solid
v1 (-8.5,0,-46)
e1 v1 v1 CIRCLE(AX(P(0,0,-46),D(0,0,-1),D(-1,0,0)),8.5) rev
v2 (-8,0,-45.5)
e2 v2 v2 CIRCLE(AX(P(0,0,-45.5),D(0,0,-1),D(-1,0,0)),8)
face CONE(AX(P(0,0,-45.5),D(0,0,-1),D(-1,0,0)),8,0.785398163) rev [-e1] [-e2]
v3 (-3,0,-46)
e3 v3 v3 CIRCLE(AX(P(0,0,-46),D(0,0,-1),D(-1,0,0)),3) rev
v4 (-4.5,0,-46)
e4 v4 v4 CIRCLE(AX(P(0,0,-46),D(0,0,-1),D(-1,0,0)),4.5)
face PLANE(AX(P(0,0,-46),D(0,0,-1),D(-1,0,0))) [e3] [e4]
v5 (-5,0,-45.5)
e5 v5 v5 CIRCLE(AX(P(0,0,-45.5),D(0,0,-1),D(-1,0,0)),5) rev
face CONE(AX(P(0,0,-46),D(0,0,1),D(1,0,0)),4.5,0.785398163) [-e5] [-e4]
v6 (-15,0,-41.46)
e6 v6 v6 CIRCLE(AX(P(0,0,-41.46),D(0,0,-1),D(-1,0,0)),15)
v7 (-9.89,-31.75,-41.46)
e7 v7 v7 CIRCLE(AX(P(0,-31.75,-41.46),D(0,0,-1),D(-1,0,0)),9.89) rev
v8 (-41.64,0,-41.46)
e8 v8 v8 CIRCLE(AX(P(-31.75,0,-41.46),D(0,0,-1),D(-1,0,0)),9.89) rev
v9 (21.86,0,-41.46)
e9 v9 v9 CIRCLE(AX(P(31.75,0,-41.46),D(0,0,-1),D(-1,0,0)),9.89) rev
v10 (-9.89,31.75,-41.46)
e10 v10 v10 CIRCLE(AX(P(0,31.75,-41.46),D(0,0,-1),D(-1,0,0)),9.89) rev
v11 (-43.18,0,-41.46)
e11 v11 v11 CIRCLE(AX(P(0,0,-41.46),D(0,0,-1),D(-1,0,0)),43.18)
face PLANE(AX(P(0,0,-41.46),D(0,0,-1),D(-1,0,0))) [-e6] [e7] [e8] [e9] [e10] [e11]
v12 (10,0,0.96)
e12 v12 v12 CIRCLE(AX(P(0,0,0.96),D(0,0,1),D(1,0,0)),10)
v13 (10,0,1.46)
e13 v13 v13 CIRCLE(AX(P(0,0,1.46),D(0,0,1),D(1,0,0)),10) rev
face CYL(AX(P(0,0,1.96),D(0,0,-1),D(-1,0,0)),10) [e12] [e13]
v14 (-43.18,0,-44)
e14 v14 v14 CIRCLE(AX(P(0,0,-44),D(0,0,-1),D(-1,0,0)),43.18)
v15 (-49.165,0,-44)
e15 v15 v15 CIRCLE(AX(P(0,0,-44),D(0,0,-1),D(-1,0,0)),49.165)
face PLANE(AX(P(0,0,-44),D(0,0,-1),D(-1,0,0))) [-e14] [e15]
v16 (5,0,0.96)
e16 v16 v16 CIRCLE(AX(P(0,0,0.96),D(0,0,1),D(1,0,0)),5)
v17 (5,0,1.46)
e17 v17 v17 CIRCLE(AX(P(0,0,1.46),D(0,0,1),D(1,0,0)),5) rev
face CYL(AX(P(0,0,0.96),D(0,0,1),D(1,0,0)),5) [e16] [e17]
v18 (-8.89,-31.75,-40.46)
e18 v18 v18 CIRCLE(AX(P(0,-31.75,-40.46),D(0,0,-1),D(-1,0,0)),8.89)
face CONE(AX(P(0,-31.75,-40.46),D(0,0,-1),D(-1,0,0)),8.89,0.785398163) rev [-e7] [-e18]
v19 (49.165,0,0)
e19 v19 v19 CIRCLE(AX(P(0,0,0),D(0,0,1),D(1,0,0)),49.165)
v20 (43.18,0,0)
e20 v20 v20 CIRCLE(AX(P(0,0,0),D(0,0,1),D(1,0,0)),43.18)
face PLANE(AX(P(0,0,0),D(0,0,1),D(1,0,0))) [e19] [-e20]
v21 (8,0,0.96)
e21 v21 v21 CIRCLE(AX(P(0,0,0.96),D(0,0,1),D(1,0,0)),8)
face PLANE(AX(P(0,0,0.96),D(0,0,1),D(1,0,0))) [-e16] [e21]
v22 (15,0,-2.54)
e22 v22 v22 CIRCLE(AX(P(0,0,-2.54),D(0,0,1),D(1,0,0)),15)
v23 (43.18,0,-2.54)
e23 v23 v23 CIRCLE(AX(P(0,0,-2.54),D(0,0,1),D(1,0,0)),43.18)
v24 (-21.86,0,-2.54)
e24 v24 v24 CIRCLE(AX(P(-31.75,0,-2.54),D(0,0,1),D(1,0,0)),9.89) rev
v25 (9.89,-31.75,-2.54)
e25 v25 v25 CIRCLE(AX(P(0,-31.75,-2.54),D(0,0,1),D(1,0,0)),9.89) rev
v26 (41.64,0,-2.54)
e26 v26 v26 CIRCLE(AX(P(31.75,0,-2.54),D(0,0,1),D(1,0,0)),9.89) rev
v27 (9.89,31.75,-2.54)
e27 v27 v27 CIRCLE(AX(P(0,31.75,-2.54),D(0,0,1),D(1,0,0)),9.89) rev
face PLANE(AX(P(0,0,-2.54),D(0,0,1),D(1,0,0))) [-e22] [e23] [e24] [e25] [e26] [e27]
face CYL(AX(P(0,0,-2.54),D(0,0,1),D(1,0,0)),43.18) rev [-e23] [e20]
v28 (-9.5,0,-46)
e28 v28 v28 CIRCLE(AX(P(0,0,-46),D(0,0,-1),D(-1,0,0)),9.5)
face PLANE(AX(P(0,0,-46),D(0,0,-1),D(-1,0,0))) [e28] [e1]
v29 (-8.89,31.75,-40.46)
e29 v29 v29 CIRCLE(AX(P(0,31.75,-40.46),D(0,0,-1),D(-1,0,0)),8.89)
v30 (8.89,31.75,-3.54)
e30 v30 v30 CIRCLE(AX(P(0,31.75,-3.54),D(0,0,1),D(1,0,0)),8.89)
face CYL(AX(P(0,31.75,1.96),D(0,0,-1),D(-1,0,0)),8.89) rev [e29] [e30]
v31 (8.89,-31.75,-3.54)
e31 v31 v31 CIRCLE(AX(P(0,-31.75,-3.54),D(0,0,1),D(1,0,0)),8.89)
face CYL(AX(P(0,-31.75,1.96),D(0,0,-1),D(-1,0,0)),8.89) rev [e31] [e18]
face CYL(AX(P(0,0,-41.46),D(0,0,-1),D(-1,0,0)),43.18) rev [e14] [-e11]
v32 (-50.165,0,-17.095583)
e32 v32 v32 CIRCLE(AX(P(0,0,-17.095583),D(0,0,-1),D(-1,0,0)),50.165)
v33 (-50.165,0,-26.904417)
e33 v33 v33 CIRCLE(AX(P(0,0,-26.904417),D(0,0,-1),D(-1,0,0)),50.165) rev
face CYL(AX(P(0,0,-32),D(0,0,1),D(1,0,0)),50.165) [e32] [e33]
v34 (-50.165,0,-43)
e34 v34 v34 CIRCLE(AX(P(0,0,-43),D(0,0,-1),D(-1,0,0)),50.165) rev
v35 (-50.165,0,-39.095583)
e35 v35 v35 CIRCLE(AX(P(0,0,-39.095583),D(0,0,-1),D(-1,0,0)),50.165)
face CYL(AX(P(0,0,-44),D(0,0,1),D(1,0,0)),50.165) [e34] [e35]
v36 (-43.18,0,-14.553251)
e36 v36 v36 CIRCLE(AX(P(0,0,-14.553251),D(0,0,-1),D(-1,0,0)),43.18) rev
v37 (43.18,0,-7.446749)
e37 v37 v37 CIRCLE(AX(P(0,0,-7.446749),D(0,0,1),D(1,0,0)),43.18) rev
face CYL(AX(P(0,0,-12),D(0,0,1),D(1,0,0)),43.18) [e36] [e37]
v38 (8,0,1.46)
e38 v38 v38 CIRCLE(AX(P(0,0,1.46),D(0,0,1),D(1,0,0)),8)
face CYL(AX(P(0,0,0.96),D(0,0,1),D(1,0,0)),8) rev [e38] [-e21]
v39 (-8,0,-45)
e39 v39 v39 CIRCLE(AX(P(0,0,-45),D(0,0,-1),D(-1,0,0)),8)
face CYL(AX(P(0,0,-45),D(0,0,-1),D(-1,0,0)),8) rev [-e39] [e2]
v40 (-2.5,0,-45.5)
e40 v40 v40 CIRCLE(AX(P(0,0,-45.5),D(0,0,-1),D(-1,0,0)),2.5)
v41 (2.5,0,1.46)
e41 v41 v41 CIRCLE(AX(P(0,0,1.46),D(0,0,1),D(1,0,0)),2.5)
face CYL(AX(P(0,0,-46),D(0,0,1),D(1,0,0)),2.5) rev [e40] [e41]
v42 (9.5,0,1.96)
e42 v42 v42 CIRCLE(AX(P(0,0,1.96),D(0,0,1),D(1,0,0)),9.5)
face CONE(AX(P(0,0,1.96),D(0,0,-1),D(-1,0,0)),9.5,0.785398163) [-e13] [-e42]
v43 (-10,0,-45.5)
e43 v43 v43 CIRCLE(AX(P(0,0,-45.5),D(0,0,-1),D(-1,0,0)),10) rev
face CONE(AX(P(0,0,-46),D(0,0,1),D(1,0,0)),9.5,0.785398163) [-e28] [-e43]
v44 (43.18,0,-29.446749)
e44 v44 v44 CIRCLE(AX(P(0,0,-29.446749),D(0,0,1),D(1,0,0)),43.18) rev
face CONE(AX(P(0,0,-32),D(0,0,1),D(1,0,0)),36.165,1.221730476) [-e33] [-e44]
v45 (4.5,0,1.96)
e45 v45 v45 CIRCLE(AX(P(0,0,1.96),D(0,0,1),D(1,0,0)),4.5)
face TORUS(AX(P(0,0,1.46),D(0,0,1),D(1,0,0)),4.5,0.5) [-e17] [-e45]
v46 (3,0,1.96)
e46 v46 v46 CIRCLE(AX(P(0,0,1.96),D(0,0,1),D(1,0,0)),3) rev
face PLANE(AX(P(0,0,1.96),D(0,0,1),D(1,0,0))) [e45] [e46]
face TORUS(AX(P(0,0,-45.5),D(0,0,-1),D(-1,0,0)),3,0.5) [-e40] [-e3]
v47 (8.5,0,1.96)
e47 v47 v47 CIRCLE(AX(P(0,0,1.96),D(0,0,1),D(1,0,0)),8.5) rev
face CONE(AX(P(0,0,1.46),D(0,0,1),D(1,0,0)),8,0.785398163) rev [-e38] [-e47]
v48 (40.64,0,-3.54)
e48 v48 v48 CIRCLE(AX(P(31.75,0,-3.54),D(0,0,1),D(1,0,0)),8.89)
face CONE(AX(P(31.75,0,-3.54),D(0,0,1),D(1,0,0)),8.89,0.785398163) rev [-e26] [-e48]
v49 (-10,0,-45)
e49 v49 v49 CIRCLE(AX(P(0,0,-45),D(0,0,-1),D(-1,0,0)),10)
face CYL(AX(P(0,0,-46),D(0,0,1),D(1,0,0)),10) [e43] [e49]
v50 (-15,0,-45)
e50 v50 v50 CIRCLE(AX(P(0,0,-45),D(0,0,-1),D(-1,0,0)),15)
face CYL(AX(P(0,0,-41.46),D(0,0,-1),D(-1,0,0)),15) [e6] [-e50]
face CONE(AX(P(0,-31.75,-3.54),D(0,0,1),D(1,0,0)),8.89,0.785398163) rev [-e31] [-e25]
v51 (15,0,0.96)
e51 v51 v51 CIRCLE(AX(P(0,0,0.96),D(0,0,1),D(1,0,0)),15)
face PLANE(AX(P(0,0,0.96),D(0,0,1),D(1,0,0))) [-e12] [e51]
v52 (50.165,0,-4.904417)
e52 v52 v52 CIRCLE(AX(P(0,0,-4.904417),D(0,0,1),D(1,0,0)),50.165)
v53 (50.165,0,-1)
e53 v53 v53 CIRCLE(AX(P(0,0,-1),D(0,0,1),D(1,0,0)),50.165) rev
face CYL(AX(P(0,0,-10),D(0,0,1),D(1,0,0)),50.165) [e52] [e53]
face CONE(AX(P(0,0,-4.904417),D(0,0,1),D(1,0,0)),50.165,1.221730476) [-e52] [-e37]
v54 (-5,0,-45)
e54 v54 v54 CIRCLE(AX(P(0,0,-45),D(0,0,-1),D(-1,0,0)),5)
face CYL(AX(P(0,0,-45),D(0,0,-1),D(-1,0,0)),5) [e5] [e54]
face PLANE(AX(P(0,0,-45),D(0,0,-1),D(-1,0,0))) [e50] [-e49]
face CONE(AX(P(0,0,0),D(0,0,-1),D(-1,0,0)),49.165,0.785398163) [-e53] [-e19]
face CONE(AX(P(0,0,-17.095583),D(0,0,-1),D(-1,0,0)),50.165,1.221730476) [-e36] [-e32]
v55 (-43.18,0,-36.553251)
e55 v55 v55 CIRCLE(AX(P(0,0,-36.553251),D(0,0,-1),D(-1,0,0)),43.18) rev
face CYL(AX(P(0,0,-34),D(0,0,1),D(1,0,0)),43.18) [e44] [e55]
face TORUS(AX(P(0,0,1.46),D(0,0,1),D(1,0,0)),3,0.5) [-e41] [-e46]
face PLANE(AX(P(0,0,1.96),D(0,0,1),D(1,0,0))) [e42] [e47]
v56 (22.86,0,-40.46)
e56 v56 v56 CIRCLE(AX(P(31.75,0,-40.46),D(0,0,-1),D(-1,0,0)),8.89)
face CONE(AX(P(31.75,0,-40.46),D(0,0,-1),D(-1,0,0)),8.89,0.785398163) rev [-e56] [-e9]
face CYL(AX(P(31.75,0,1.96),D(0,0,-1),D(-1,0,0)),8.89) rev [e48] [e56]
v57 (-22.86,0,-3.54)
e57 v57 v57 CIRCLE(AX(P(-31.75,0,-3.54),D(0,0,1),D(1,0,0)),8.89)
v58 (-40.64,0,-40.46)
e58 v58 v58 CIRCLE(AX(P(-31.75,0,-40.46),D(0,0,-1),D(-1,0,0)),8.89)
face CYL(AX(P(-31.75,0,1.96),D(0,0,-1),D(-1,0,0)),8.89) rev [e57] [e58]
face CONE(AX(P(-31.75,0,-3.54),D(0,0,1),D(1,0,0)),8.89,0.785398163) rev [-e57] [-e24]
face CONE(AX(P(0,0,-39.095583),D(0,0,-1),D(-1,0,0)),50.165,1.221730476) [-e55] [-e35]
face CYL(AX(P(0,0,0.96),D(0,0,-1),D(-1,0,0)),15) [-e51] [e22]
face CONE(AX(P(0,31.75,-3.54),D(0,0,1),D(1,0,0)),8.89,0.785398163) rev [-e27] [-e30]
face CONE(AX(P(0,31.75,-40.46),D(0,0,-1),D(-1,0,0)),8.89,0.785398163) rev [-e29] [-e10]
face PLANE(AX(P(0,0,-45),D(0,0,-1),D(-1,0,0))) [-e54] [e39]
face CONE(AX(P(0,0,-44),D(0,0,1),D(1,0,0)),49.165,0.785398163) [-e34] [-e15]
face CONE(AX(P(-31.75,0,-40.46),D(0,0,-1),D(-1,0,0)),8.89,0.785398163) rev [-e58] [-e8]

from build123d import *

# Parameters (mm, degrees)
SKETCH2_R            = 50.165
BOSS_EXTRUDE1_DEPTH  = 10
SKETCH4_R            = 43.18
BOSS_EXTRUDE2_DEPTH  = 2
SKETCH5_R            = 50.165
BOSS_EXTRUDE3_DEPTH  = 20
SKETCH7_R            = 43.18
BOSS_EXTRUDE4_DEPTH  = 2
SKETCH8_R            = 50.165
BOSS_EXTRUDE5_DEPTH  = 10
CHAMFER1_SIZE        = 14
CHAMFER1_SIZE_2      = 5.09558328
CHAMFER2_SIZE        = 5.09558328
CHAMFER2_SIZE_2      = 14
CHAMFER4_SIZE        = 14
CHAMFER4_SIZE_2      = 5.09558328
CHAMFER5_SIZE        = 5.09558328
CHAMFER5_SIZE_2      = 14
SKETCH13_R           = 43.18
CUT_EXTRUDE3_DEPTH   = 2.54
SKETCH18_R           = 15
BOSS_EXTRUDE12_DEPTH = 3.5
SKETCH19_R           = 10
BOSS_EXTRUDE13_DEPTH = 1
SKETCH20_R           = 8
SKETCH20_R_2         = 5
CUT_EXTRUDE4_DEPTH   = 1
CUT_EXTRUDE5_START   = -2.54
SKETCH22_R           = 43.18
SKETCH22_R_2         = 15
CUT_EXTRUDE5_DEPTH   = 2.54
SKETCH23_R           = 15
BOSS_EXTRUDE14_DEPTH = 1
BOSS_EXTRUDE15_START = 1
SKETCH24_R           = 10
BOSS_EXTRUDE15_DEPTH = 1
CUT_EXTRUDE6_START   = -1
SKETCH25_R           = 8
SKETCH25_R_2         = 5
CUT_EXTRUDE6_DEPTH   = 1
SKETCH26_R           = 2.5
CUT_EXTRUDE7_DEPTH   = 86.634199068
CHAMFER9_SIZE        = 0.5
FILLET1_R            = 0.5
FILLET2_R            = 0.5
CHAMFER10_SIZE       = 0.5
CHAMFER11_SIZE       = 0.5
FILLET3_R            = 0.5
SKETCH29_R           = 8.89
CUT_EXTRUDE9_DEPTH   = 85.530326215
CHAMFER12_SIZE       = 1
CHAMFER13_SIZE       = 1


with BuildPart() as part:
    # Sketch2 → Boss-Extrude1 (new body)
    with BuildSketch(Plane.XY):
        Circle(SKETCH2_R)
    extrude(amount=-BOSS_EXTRUDE1_DEPTH)

    # Sketch4 → Boss-Extrude2 (add)
    with BuildSketch(Plane(origin=(0, 0, -10), x_dir=(-1, 0, 0), z_dir=(0, 0, -1))):
        with Locations(Location((0, 0, 0), (0, 0, 180))):
            Circle(SKETCH4_R)
    extrude(amount=BOSS_EXTRUDE2_DEPTH)

    # Sketch5 → Boss-Extrude3 (add)
    with BuildSketch(Plane(origin=(0, 0, -12), x_dir=(-1, 0, 0), z_dir=(0, 0, -1))):
        with Locations(Location((0, 0, 0), (0, 0, 180))):
            Circle(SKETCH5_R)
    extrude(amount=BOSS_EXTRUDE3_DEPTH)

    # Sketch7 → Boss-Extrude4 (add)
    with BuildSketch(Plane(origin=(0, 0, -32), x_dir=(-1, 0, 0), z_dir=(0, 0, -1))):
        with Locations(Location((0, 0, 0), (0, 0, 180))):
            Circle(SKETCH7_R)
    extrude(amount=BOSS_EXTRUDE4_DEPTH)

    # Sketch8 → Boss-Extrude5 (add)
    with BuildSketch(Plane(origin=(0, 0, -34), x_dir=(-1, 0, 0), z_dir=(0, 0, -1))):
        with Locations(Location((0, 0, 0), (0, 0, 180))):
            Circle(SKETCH8_R)
    extrude(amount=BOSS_EXTRUDE5_DEPTH)

    # Chamfer1
    # the kernel refuses this chamfer: 14, 5.09558328 mm, written as the material it takes off along each edge
    with BuildSketch(Plane(origin=(0, 0, -10), x_dir=(1, 0, 0), z_dir=(0, -1, 0))) as chamfer1_piece_1_section:
        Polygon((50.165 - CHAMFER1_SIZE, 0), (50.165, CHAMFER1_SIZE_2), (50.165, 0), align=None)
    chamfer1_piece_1 = revolve(axis=Axis((0, 0, -10), (0, 0, 1)), mode=Mode.PRIVATE)
    chamfer1_piece_1 = chamfer1_piece_1 - Plane(origin=(0, 0, -6.275641512), x_dir=(1, 0, 0), z_dir=(0, 0, 1)) * Cylinder(43.18, 201, mode=Mode.PRIVATE)
    add(chamfer1_piece_1, mode=Mode.SUBTRACT)

    # Chamfer2
    # the kernel refuses this chamfer: 14, 5.09558328 mm, written as the material it takes off along each edge
    with BuildSketch(Plane(origin=(0, 0, -12), x_dir=(1, 0, 0), z_dir=(0, 1, 0))) as chamfer2_piece_1_section:
        Polygon((50.165, CHAMFER2_SIZE), (50.165 - CHAMFER2_SIZE_2, 0), (50.165, 0), align=None)
    chamfer2_piece_1 = revolve(axis=Axis((0, 0, -12), (0, 0, -1)), mode=Mode.PRIVATE)
    chamfer2_piece_1 = chamfer2_piece_1 - Plane(origin=(0, 0, -15.724358488), x_dir=(1, 0, 0), z_dir=(0, 0, 1)) * Cylinder(43.18, 201, mode=Mode.PRIVATE)
    add(chamfer2_piece_1, mode=Mode.SUBTRACT)

    # Chamfer4
    # the kernel refuses this chamfer: 14, 5.09558328 mm, written as the material it takes off along each edge
    with BuildSketch(Plane(origin=(0, 0, -32), x_dir=(1, 0, 0), z_dir=(0, 1, 0))) as chamfer4_piece_1_section:
        Polygon((50.165 - CHAMFER4_SIZE, 0), (50.165, -CHAMFER4_SIZE_2), (50.165, 0), align=None)
    chamfer4_piece_1 = revolve(axis=Axis((0, 0, -32), (0, 0, -1)), mode=Mode.PRIVATE)
    chamfer4_piece_1 = chamfer4_piece_1 - Plane(origin=(0, 0, -28.275641512), x_dir=(1, 0, 0), z_dir=(0, 0, 1)) * Cylinder(43.18, 201, mode=Mode.PRIVATE)
    add(chamfer4_piece_1, mode=Mode.SUBTRACT)

    # Chamfer5
    # the kernel refuses this chamfer: 14, 5.09558328 mm, written as the material it takes off along each edge
    with BuildSketch(Plane(origin=(0, 0, -34), x_dir=(1, 0, 0), z_dir=(0, 1, 0))) as chamfer5_piece_1_section:
        Polygon((50.165, CHAMFER5_SIZE), (50.165 - CHAMFER5_SIZE_2, 0), (50.165, 0), align=None)
    chamfer5_piece_1 = revolve(axis=Axis((0, 0, -34), (0, 0, -1)), mode=Mode.PRIVATE)
    chamfer5_piece_1 = chamfer5_piece_1 - Plane(origin=(0, 0, -37.724358488), x_dir=(1, 0, 0), z_dir=(0, 0, 1)) * Cylinder(43.18, 201, mode=Mode.PRIVATE)
    add(chamfer5_piece_1, mode=Mode.SUBTRACT)

    # Sketch13 → Cut-Extrude3 (cut)
    with BuildSketch(Plane.XY):
        Circle(SKETCH13_R)
    extrude(amount=-CUT_EXTRUDE3_DEPTH, mode=Mode.SUBTRACT)

    # Sketch18 → Boss-Extrude12 (add)
    with BuildSketch(Plane.XY.offset(-2.54)):
        Circle(SKETCH18_R)
    extrude(amount=BOSS_EXTRUDE12_DEPTH)

    # Sketch19 → Boss-Extrude13 (add)
    with BuildSketch(Plane.XY.offset(0.96)):
        Circle(SKETCH19_R)
    extrude(amount=BOSS_EXTRUDE13_DEPTH)

    # Sketch20 → Cut-Extrude4 (cut)
    with BuildSketch(Plane.XY.offset(1.96)):
        Circle(SKETCH20_R)
        Circle(SKETCH20_R_2, mode=Mode.SUBTRACT)
    extrude(amount=-CUT_EXTRUDE4_DEPTH, mode=Mode.SUBTRACT)

    # Sketch22 → Cut-Extrude5 (cut)
    with BuildSketch(Plane(origin=(0, 0, -44), x_dir=(-1, 0, 0), z_dir=(0, 0, -1)).offset(CUT_EXTRUDE5_START)):
        with Locations(Location((0, 0, 0), (0, 0, 180))):
            Circle(SKETCH22_R)
        with Locations(Location((0, 0, 0), (0, 0, 180))):
            Circle(SKETCH22_R_2, mode=Mode.SUBTRACT)
    extrude(amount=CUT_EXTRUDE5_DEPTH, mode=Mode.SUBTRACT)

    # Sketch23 → Boss-Extrude14 (add)
    with BuildSketch(Plane(origin=(0, 0, -44), x_dir=(-1, 0, 0), z_dir=(0, 0, -1))):
        with Locations(Location((0, 0, 0), (0, 0, 180))):
            Circle(SKETCH23_R)
    extrude(amount=BOSS_EXTRUDE14_DEPTH)

    # Sketch24 → Boss-Extrude15 (add)
    with BuildSketch(Plane(origin=(0, 0, -45), x_dir=(-1, 0, 0), z_dir=(0, 0, -1)).offset(BOSS_EXTRUDE15_START)):
        with Locations(Location((0, 0, 0), (0, 0, 180))):
            Circle(SKETCH24_R)
    extrude(amount=-BOSS_EXTRUDE15_DEPTH)

    # Sketch25 → Cut-Extrude6 (cut)
    with BuildSketch(Plane(origin=(0, 0, -46), x_dir=(-1, 0, 0), z_dir=(0, 0, -1)).offset(CUT_EXTRUDE6_START)):
        with Locations(Location((0, 0, 0), (0, 0, 180))):
            Circle(SKETCH25_R)
        with Locations(Location((0, 0, 0), (0, 0, 180))):
            Circle(SKETCH25_R_2, mode=Mode.SUBTRACT)
    extrude(amount=CUT_EXTRUDE6_DEPTH, mode=Mode.SUBTRACT)

    # Sketch26 → Cut-Extrude7 (cut, through all)
    with BuildSketch(Plane.XY.offset(1.96)):
        Circle(SKETCH26_R)
    extrude(amount=-CUT_EXTRUDE7_DEPTH, mode=Mode.SUBTRACT)

    # Chamfer9
    chamfer9_edges = [part.edges().sort_by_distance(p)[0] for p in [
        (-10, 0, 1.96),
        (-8, 0, 1.96),
    ]]
    chamfer(chamfer9_edges, length=CHAMFER9_SIZE)

    # Fillet1
    fillet1_edges = [part.edges().sort_by_distance(p)[0] for p in [
        (-5, 0, 1.96),
    ]]
    fillet(fillet1_edges, radius=FILLET1_R)

    # Fillet2
    fillet2_edges = [part.edges().sort_by_distance(p)[0] for p in [
        (-2.5, 0, 1.96),
    ]]
    fillet(fillet2_edges, radius=FILLET2_R)

    # Chamfer10
    chamfer10_edges = [part.edges().sort_by_distance(p)[0] for p in [
        (-10, 0, -46),
        (-8, 0, -46),
    ]]
    chamfer(chamfer10_edges, length=CHAMFER10_SIZE)

    # Chamfer11
    chamfer11_edges = [part.edges().sort_by_distance(p)[0] for p in [
        (-5, 0, -46),
    ]]
    chamfer(chamfer11_edges, length=CHAMFER11_SIZE)

    # Fillet3
    fillet3_edges = [part.edges().sort_by_distance(p)[0] for p in [
        (-2.5, 0, -46),
    ]]
    fillet(fillet3_edges, radius=FILLET3_R)

    # Sketch29 → Cut-Extrude9 (cut, through all)
    with BuildSketch(Plane(origin=(0, 0, -44), x_dir=(-1, 0, 0), z_dir=(0, 0, -1))):
        with Locations((0, 31.75)):
            Circle(SKETCH29_R)
        with Locations((31.75, 0)):
            Circle(SKETCH29_R)
        with Locations((0, -31.75)):
            Circle(SKETCH29_R)
        with Locations((-31.75, 0)):
            Circle(SKETCH29_R)
    extrude(amount=-CUT_EXTRUDE9_DEPTH, mode=Mode.SUBTRACT)

    # Chamfer12
    chamfer12_edges = [part.edges().sort_by_distance(p)[0] for p in [
        (8.89, 31.75, -2.54),
        (8.89, 31.75, -41.46),
        (-22.86, 0, -2.54),
        (-22.86, 0, -41.46),
        (8.89, -31.75, -2.54),
        (8.89, -31.75, -41.46),
        (40.64, 0, -2.54),
        (40.64, 0, -41.46),
    ]]
    chamfer(chamfer12_edges, length=CHAMFER12_SIZE)

    # Chamfer13
    chamfer13_edges = [part.edges().sort_by_distance(p)[0] for p in [
        (-50.165, 0, 0),
        (-50.165, 0, -44),
    ]]
    chamfer(chamfer13_edges, length=CHAMFER13_SIZE)


solid = part.part
